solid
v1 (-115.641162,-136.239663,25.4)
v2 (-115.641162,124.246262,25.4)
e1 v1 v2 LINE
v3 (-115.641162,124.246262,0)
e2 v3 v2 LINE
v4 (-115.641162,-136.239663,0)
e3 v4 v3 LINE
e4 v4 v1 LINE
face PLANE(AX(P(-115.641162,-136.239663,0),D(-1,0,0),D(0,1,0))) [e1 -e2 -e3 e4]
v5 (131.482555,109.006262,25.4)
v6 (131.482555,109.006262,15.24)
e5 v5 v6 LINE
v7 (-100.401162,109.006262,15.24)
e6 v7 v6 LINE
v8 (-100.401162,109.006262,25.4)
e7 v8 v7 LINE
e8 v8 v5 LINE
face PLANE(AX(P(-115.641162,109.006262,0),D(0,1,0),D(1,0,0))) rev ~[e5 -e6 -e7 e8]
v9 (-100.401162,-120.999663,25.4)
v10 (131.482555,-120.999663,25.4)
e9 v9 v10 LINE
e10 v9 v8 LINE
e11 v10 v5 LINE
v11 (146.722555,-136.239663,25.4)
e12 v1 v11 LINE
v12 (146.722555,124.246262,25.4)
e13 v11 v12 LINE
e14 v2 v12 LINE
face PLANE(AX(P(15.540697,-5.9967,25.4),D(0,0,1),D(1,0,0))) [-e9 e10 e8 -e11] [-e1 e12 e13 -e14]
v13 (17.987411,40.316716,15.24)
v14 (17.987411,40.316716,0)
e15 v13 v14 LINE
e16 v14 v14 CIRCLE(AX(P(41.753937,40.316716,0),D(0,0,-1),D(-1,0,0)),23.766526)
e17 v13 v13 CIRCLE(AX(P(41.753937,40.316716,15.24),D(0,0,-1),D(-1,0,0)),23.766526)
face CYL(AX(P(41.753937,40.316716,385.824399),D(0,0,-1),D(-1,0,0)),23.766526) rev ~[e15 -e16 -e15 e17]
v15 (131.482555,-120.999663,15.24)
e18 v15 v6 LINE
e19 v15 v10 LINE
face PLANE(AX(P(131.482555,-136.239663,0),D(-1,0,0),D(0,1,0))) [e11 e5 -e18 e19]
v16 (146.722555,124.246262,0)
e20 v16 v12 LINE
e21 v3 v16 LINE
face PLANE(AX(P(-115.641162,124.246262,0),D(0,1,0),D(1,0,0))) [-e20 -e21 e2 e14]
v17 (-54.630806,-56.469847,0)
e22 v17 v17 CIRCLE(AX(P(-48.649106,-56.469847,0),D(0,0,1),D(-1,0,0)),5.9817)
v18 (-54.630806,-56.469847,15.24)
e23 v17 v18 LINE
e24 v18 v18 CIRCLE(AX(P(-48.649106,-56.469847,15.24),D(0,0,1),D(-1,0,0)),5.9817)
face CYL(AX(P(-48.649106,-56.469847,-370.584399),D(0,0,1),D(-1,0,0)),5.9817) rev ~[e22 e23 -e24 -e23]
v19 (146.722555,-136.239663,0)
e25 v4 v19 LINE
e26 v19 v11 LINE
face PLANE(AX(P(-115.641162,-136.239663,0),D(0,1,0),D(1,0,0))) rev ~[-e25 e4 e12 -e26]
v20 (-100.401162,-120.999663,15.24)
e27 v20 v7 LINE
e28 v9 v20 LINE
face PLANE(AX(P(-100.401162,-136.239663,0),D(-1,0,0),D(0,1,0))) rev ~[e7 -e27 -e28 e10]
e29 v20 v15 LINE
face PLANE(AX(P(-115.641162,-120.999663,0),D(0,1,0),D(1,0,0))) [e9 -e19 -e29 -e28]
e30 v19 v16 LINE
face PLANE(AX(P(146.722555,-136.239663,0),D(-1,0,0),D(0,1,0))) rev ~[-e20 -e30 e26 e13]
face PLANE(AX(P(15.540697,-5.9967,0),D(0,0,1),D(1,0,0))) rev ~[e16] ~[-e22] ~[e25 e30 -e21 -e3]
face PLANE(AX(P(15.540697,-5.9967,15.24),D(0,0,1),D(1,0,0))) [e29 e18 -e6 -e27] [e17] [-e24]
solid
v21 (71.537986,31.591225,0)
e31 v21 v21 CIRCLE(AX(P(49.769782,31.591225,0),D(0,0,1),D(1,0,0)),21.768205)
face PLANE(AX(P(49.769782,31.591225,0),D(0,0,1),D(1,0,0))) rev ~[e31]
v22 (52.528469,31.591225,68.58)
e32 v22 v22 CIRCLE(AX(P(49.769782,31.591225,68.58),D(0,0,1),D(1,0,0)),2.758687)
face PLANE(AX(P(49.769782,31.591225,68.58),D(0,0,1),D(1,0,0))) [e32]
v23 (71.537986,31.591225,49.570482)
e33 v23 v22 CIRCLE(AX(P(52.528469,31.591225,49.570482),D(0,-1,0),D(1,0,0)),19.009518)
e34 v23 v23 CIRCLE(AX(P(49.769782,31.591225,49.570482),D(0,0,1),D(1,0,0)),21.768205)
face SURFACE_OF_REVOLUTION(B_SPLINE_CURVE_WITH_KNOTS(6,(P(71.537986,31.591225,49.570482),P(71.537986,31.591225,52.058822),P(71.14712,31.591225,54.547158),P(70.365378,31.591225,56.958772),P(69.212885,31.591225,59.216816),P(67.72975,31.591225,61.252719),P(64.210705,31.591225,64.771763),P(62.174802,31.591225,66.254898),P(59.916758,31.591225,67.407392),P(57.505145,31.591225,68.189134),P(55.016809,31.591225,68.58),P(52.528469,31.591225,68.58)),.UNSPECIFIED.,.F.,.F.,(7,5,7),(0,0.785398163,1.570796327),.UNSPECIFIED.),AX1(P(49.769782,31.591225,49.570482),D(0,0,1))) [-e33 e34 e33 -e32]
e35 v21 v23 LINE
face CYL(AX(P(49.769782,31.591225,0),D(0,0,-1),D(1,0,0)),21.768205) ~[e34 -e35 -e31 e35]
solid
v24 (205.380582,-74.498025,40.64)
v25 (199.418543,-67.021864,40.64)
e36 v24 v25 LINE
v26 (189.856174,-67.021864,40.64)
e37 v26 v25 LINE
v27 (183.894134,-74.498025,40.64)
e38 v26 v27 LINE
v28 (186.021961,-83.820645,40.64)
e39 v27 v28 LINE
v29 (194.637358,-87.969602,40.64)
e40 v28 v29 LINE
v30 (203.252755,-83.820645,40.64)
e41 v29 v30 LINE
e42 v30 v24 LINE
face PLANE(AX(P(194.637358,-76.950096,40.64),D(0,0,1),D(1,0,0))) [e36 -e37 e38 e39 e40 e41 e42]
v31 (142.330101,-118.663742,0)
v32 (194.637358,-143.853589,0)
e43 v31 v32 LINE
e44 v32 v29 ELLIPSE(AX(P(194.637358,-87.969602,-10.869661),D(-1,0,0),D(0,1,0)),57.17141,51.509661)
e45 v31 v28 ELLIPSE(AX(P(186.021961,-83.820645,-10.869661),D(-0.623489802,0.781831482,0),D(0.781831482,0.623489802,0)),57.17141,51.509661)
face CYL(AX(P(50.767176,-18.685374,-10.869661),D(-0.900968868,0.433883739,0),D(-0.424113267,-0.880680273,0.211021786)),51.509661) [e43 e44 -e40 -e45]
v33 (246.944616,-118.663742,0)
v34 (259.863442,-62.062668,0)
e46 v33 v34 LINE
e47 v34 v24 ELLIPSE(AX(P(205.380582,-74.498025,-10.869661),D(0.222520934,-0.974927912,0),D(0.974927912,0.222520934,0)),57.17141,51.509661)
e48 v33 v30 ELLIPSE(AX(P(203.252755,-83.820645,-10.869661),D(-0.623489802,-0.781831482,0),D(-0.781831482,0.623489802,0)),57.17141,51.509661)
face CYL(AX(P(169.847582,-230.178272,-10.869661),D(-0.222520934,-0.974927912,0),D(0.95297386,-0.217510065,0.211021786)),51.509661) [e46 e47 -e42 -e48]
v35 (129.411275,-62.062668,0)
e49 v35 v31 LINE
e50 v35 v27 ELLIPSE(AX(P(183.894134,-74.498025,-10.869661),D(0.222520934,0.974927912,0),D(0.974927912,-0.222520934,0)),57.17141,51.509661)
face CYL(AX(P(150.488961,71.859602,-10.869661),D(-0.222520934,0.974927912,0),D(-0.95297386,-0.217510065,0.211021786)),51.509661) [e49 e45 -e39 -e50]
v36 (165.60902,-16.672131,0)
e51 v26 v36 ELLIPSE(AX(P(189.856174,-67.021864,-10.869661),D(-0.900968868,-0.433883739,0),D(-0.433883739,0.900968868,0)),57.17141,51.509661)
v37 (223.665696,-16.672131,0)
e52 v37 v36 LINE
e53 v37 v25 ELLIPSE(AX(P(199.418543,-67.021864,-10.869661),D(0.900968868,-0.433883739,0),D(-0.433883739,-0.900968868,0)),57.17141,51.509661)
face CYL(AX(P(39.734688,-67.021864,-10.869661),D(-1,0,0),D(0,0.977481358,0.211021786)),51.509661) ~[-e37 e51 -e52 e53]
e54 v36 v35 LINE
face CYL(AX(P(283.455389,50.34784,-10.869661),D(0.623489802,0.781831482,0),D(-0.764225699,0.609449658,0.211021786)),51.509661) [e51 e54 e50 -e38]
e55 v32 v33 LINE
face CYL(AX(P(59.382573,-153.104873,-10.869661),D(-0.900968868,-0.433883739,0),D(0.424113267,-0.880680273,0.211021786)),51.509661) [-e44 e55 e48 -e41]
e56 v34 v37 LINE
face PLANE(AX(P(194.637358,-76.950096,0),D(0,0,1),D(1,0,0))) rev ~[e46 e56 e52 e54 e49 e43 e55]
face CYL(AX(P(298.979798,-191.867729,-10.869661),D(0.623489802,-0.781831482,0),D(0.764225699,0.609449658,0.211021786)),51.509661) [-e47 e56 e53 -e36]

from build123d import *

# Parameters (mm, degrees)
F2_W          = 262.36371696
F2_H          = 260.4859247804
F3_DEPTH      = 25.4
F6_T          = -15.24
F8_D          = 47.533052
F9_R          = 21.7682047425
F10_DEPTH     = 68.58
F11_R         = 19.0095175901
F13_DEPTH     = 40.64
F14_T1_DEPTH  = 309.8053408432
F14_T3_DEPTH  = 309.8053408432
F14_T5_DEPTH  = 309.8053408432
F14_T7_DEPTH  = 309.8053408432
F14_T9_DEPTH  = 309.8053408432
F14_T11_DEPTH = 309.8053408432
F14_T13_DEPTH = 309.8053408432
F15_D         = 11.9634


# Not quite as in the source:
# - a fillet or chamfer that OpenCascade refuses, or shapes differently, is made with other operations: its cross-section is extruded or revolved along the edge and cut away or added
# - the program builds the solid bodies; features that only make, move or delete a surface that nothing else refers to are left out


with BuildPart() as f3:
    # F2 (on Top) → F3 (new body)
    with BuildSketch(Plane.XY):
        with Locations((15.5406966805, -5.9967003763)):
            Rectangle(F2_W, F2_H)
    extrude(amount=F3_DEPTH)

    # F6
    f6_openings = [f3.faces().sort_by_distance(p)[0] for p in [
        (15.540697, -5.9967, 25.4),
    ]]
    offset(amount=F6_T, openings=f6_openings)

    # F8 (through all)
    with Locations(Plane.XY.offset(15.24)):
        with Locations((41.753936559, 40.3167158365)):
            Hole(F8_D / 2)

    # F15 (through all)
    with Locations(Plane(origin=(0, 0, 0), x_dir=(1, 0, 0), z_dir=(0, 0, -1))):
        with Locations((-48.6491061747, 56.4698465168)):
            Hole(F15_D / 2)


with BuildPart() as f10:
    # F9 (on Top) → F10 (new body)
    with BuildSketch(Plane.XY):
        with Locations((49.7697815299, 31.5912254155)):
            Circle(F9_R)
    extrude(amount=F10_DEPTH)

    # F11
    f11_edges = [f10.edges().sort_by_distance(p)[0] for p in [
        (28.001577, 31.591225, 68.58),
    ]]
    fillet(f11_edges, radius=F11_R)


with BuildPart() as f13:
    # F12 (on Top) → F13 (new body)
    with BuildSketch(Plane.XY):
        Polygon((223.6656961674, -16.6721306741), (165.6090202099, -16.6721306741), (129.4112748206, -62.0626677051), (142.330100577, -118.6637415846), (194.6373581886, -143.8535892298), (246.9446158002, -118.6637415846), (259.8634415567, -62.0626677051), align=None)
    extrude(amount=F13_DEPTH)

    # F14: fillet of radius 51.5096605668 on 7 edges, made by hand

    # F14_s2 → F14_t1 (cut)
    with BuildSketch(Plane(origin=(209.7538690392, -263.0230324464, 0), x_dir=(0, 0, 1), z_dir=(-0.6234898019, 0.7818314825, 0))):
        with BuildLine():
            ThreePointArc((0, 164.4739793612), (29.2123656917, 146.4766234639), (40.64, 114.1242463841))
            Line((40.64, 114.1242463841), (40.64, 164.4739793612))
            Line((40.64, 164.4739793612), (0, 164.4739793612))
        make_face()
    extrude(amount=F14_T1_DEPTH, mode=Mode.SUBTRACT)

    # F14_s4 → F14_t3 (cut)
    with BuildSketch(Plane.YZ.offset(39.734687767)):
        with BuildLine():
            ThreePointArc((-16.6721306741, 0), (-34.6694865714, 29.2123656917), (-67.0218636513, 40.64))
            Line((-67.0218636513, 40.64), (-16.6721306741, 40.64))
            Line((-16.6721306741, 40.64), (-16.6721306741, 0))
        make_face()
    extrude(amount=F14_T3_DEPTH, mode=Mode.SUBTRACT)

    # F14_s6 → F14_t5 (cut)
    with BuildSketch(Plane(origin=(134.7330729996, 168.9499297129, 0), x_dir=(0, 0, 1), z_dir=(-0.6234898019, -0.7818314825, 0))):
        with BuildLine():
            ThreePointArc((0, -139.8732492313), (29.2123656917, -157.8706051286), (40.64, -190.2229822085))
            Line((40.64, -190.2229822085), (40.64, -139.8732492313))
            Line((40.64, -139.8732492313), (0, -139.8732492313))
        make_face()
    extrude(amount=F14_T5_DEPTH, mode=Mode.SUBTRACT)

    # F14_s8 → F14_t7 (cut)
    with BuildSketch(Plane(origin=(-8.1378103287, 35.654076641, 0), x_dir=(0, 0, 1), z_dir=(0.222520934, -0.9749279122, 0))):
        with BuildLine():
            ThreePointArc((0, -112.356421192), (29.2123656917, -130.3537770893), (40.64, -162.7061541692))
            Line((40.64, -162.7061541692), (40.64, -112.356421192))
            Line((40.64, -112.356421192), (0, -112.356421192))
        make_face()
    extrude(amount=F14_T7_DEPTH, mode=Mode.SUBTRACT)

    # F14_s10 → F14_t9 (cut)
    with BuildSketch(Plane(origin=(48.5144030923, -23.3633051759, 0), x_dir=(0, 0, 1), z_dir=(0.9009688679, -0.4338837391, 0))):
        with BuildLine():
            ThreePointArc((0, 45.1576206892), (29.2123656917, 27.1602647919), (40.64, -5.1921122879))
            Line((40.64, -5.1921122879), (40.64, 45.1576206892))
            Line((40.64, 45.1576206892), (0, 45.1576206892))
        make_face()
    extrude(amount=F14_T9_DEPTH, mode=Mode.SUBTRACT)

    # F14_s12 → F14_t11 (cut)
    with BuildSketch(Plane(origin=(-11.6476042219, -5.6091905632, 0), x_dir=(0, 0, 1), z_dir=(0.9009688679, 0.4338837391, 0))):
        with BuildLine():
            ThreePointArc((0, 214.0575901749), (29.2123656917, 196.0602342776), (40.64, 163.7078571978))
            Line((40.64, 163.7078571978), (40.64, 214.0575901749))
            Line((40.64, 214.0575901749), (0, 214.0575901749))
        make_face()
    extrude(amount=F14_T11_DEPTH, mode=Mode.SUBTRACT)

    # F14_s14 → F14_t13 (cut)
    with BuildSketch(Plane(origin=(-41.5252055305, -181.9338127472, 0), x_dir=(0, 0, 1), z_dir=(0.222520934, 0.9749279122, 0))):
        with BuildLine():
            ThreePointArc((0, 267.1583653108), (29.2123656917, 249.1610094135), (40.64, 216.8086323337))
            Line((40.64, 216.8086323337), (40.64, 267.1583653108))
            Line((40.64, 267.1583653108), (0, 267.1583653108))
        make_face()
    extrude(amount=F14_T13_DEPTH, mode=Mode.SUBTRACT)


solid = Compound([f3.part, f10.part, f13.part])
